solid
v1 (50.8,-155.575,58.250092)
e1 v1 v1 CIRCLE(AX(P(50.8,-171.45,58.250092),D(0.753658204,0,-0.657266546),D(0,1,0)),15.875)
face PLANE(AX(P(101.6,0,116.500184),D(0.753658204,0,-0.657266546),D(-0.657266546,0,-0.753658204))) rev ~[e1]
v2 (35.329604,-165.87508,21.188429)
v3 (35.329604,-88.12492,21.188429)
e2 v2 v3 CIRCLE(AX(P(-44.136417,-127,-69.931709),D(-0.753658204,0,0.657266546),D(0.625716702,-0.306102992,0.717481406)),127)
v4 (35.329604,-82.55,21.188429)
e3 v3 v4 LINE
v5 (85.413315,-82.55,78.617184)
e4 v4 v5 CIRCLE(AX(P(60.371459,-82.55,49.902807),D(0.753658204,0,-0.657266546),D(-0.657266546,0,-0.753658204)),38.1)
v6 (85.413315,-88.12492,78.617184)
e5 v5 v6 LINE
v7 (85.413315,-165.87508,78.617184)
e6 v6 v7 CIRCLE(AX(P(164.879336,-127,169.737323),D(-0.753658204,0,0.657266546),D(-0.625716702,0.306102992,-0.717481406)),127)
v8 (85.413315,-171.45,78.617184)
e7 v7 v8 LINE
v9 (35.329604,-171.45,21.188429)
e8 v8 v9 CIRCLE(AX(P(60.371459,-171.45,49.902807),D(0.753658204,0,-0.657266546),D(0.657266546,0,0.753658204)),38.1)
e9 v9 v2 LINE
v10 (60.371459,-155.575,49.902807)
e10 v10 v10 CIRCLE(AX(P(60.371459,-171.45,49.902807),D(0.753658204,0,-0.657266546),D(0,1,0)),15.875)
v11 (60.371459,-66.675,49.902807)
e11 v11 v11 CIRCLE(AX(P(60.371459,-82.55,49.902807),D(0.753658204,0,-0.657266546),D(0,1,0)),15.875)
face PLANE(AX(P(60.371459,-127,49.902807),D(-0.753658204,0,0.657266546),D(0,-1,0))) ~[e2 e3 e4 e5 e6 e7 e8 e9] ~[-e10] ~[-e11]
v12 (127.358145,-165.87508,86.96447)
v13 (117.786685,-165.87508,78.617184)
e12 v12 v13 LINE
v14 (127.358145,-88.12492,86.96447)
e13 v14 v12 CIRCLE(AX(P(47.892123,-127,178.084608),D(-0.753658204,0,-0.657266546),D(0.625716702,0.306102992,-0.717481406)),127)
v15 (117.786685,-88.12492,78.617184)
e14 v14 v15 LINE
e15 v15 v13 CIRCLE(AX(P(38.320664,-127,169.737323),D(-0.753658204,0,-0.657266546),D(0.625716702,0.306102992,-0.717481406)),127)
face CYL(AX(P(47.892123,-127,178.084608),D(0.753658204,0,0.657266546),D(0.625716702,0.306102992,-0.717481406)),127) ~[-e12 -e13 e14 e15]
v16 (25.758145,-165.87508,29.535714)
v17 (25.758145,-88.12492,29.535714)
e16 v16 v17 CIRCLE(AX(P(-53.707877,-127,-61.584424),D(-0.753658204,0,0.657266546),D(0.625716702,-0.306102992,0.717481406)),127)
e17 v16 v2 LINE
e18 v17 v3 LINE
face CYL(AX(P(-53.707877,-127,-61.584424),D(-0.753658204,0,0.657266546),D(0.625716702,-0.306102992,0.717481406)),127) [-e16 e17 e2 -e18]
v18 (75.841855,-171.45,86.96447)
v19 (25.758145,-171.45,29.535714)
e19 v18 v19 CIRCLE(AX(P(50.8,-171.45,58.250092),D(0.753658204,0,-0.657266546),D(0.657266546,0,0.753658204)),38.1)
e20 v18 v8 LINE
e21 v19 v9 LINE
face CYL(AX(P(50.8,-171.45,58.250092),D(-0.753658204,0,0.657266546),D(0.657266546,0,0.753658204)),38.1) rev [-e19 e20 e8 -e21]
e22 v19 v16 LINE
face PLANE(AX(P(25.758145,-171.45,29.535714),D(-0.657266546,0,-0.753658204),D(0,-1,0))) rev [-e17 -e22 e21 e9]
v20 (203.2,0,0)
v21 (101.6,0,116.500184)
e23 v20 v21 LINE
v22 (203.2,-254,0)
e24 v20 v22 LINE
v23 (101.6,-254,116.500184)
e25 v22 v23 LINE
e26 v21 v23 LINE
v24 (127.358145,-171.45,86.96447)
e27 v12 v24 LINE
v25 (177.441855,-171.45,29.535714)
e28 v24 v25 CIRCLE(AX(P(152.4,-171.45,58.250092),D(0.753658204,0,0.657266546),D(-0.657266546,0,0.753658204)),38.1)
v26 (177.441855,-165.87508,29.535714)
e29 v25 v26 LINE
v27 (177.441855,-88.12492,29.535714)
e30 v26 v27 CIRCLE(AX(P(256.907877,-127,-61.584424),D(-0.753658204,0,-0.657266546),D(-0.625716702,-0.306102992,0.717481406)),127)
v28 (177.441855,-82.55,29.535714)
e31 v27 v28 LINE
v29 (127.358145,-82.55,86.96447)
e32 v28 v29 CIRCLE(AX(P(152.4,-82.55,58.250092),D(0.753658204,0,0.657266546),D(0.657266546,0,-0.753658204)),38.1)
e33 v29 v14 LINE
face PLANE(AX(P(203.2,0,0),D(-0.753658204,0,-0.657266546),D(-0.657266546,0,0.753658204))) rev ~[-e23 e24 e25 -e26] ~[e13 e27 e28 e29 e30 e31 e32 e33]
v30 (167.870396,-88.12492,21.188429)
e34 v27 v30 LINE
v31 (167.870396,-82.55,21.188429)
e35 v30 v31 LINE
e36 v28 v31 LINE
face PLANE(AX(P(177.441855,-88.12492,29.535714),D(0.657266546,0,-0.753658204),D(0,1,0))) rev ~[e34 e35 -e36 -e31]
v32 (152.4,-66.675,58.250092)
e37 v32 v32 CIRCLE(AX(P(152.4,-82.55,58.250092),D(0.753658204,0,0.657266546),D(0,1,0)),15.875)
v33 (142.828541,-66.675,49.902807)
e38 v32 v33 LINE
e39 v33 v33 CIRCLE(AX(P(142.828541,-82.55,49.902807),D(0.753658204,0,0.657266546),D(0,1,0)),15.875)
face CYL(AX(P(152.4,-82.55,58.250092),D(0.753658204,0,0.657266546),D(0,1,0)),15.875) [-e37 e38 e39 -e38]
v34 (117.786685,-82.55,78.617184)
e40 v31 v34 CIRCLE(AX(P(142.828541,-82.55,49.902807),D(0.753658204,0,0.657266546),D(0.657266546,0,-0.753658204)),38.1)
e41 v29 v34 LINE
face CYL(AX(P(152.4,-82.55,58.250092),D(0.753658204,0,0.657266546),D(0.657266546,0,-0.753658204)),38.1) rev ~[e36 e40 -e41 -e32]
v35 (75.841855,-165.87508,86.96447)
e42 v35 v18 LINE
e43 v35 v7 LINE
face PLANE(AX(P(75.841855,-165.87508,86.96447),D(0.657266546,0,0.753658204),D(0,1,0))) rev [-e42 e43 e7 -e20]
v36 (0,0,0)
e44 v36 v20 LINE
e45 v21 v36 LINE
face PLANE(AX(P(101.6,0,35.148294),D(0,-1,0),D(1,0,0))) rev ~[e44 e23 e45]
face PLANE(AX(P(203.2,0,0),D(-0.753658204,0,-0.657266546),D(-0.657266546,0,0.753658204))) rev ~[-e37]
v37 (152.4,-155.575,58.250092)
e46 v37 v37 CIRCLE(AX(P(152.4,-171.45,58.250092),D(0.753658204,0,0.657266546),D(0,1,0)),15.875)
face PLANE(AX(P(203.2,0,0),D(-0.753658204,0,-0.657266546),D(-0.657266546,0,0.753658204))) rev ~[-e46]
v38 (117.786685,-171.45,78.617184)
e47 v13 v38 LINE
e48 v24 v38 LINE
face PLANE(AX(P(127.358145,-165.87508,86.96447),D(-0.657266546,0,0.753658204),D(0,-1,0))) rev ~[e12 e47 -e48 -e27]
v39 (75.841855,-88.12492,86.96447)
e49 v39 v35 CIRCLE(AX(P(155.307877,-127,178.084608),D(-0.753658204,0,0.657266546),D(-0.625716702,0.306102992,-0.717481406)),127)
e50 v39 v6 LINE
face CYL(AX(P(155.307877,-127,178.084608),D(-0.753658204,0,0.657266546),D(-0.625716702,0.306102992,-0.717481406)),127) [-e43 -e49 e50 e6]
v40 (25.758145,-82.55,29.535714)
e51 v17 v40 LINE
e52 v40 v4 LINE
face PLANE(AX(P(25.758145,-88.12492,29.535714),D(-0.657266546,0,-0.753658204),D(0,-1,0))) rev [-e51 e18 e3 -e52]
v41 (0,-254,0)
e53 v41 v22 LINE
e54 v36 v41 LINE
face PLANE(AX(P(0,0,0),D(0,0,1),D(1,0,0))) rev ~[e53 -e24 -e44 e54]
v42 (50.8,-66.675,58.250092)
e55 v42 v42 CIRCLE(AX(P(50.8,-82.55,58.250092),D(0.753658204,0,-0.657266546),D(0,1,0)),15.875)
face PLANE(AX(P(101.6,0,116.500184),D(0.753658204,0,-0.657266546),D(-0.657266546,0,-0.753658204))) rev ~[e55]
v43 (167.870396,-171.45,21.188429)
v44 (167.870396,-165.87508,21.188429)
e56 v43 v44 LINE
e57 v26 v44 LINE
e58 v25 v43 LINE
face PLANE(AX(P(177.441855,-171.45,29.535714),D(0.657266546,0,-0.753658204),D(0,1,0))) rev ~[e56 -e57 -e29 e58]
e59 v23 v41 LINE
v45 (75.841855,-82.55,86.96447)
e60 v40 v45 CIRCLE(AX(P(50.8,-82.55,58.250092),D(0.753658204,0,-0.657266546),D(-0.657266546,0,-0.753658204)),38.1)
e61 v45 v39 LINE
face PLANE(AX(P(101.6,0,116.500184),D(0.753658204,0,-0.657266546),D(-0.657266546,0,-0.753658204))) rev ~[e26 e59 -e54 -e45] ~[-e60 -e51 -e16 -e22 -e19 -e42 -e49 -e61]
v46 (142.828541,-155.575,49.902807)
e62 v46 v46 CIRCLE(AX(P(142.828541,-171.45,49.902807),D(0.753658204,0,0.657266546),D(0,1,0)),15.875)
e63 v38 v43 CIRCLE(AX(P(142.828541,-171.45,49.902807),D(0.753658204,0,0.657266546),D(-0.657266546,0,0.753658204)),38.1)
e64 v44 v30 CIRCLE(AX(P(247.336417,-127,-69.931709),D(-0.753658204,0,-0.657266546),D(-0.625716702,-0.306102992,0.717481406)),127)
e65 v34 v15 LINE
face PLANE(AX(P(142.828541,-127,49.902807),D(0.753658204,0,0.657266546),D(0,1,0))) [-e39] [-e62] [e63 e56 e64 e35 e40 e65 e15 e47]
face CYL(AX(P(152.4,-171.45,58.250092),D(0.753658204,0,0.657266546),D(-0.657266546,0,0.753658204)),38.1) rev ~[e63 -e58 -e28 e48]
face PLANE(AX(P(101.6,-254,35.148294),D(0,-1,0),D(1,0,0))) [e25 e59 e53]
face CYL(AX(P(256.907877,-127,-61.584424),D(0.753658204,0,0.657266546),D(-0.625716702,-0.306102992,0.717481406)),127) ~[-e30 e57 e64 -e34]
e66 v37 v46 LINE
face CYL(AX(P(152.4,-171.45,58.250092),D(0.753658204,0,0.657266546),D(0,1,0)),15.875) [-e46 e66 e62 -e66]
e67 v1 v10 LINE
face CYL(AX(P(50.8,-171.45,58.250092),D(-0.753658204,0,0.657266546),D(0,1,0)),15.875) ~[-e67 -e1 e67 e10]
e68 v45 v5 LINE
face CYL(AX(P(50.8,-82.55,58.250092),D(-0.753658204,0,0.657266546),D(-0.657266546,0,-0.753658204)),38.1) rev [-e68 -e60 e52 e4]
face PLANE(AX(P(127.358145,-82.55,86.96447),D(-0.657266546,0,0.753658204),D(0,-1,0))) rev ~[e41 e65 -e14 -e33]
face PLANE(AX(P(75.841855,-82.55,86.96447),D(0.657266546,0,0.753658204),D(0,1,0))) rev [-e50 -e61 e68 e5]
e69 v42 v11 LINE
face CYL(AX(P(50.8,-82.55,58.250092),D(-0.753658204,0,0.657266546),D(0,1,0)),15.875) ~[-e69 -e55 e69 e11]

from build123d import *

# Parameters (mm, degrees)
F1_DEPTH = 254
F2_R     = 15.875
F3_DEPTH = 12.7


# Not quite as in the source:
# - a pattern or mirror of a feature is missing from the dataset's text; its kind, count and spacing are read off the source's solid


with BuildPart() as f1:
    # F0 (on Front) → F1 (new body)
    with BuildSketch(Plane.XZ):
        Polygon((101.6, 116.5001839399), (0, 0), (203.2, 0), align=None)
    extrude(amount=F1_DEPTH)

    # F2 (on face) → F3 (cut)
    with BuildSketch(Plane(origin=(115.4177397592, 0, 100.6559986685), x_dir=(0, 1, 0), z_dir=(0.7536582036, 0, 0.6572665458))):
        with BuildLine():
            Line((-165.875079947, -18.1667619065), (-171.45, -18.1667619065))
            ThreePointArc((-171.45, -18.1667619065), (-209.55, -56.2667619065), (-171.45, -94.3667619065))
            Line((-171.45, -94.3667619065), (-165.875079947, -94.3667619065))
            ThreePointArc((-165.875079947, -94.3667619065), (-127, -88.270559031), (-88.124920053, -94.3667619065))
            Line((-88.124920053, -94.3667619065), (-82.55, -94.3667619065))
            ThreePointArc((-82.55, -94.3667619065), (-44.45, -56.2667619065), (-82.55, -18.1667619065))
            Line((-82.55, -18.1667619065), (-88.124920053, -18.1667619065))
            ThreePointArc((-88.124920053, -18.1667619065), (-127, -24.262964782), (-165.875079947, -18.1667619065))
        make_face()
        with Locations((-171.45, -56.2667619065)):
            Circle(F2_R, mode=Mode.SUBTRACT)
        with Locations((-82.55, -56.2667619065)):
            Circle(F2_R, mode=Mode.SUBTRACT)
    f3 = extrude(amount=-F3_DEPTH, mode=Mode.SUBTRACT)

    # F3_copies: F3 across plane
    add(f3.mirror(Plane(origin=(101.6, 0, 0), x_dir=(0, 0, -1), z_dir=(-1, 0, 0))), mode=Mode.SUBTRACT)


solid = f1.part
